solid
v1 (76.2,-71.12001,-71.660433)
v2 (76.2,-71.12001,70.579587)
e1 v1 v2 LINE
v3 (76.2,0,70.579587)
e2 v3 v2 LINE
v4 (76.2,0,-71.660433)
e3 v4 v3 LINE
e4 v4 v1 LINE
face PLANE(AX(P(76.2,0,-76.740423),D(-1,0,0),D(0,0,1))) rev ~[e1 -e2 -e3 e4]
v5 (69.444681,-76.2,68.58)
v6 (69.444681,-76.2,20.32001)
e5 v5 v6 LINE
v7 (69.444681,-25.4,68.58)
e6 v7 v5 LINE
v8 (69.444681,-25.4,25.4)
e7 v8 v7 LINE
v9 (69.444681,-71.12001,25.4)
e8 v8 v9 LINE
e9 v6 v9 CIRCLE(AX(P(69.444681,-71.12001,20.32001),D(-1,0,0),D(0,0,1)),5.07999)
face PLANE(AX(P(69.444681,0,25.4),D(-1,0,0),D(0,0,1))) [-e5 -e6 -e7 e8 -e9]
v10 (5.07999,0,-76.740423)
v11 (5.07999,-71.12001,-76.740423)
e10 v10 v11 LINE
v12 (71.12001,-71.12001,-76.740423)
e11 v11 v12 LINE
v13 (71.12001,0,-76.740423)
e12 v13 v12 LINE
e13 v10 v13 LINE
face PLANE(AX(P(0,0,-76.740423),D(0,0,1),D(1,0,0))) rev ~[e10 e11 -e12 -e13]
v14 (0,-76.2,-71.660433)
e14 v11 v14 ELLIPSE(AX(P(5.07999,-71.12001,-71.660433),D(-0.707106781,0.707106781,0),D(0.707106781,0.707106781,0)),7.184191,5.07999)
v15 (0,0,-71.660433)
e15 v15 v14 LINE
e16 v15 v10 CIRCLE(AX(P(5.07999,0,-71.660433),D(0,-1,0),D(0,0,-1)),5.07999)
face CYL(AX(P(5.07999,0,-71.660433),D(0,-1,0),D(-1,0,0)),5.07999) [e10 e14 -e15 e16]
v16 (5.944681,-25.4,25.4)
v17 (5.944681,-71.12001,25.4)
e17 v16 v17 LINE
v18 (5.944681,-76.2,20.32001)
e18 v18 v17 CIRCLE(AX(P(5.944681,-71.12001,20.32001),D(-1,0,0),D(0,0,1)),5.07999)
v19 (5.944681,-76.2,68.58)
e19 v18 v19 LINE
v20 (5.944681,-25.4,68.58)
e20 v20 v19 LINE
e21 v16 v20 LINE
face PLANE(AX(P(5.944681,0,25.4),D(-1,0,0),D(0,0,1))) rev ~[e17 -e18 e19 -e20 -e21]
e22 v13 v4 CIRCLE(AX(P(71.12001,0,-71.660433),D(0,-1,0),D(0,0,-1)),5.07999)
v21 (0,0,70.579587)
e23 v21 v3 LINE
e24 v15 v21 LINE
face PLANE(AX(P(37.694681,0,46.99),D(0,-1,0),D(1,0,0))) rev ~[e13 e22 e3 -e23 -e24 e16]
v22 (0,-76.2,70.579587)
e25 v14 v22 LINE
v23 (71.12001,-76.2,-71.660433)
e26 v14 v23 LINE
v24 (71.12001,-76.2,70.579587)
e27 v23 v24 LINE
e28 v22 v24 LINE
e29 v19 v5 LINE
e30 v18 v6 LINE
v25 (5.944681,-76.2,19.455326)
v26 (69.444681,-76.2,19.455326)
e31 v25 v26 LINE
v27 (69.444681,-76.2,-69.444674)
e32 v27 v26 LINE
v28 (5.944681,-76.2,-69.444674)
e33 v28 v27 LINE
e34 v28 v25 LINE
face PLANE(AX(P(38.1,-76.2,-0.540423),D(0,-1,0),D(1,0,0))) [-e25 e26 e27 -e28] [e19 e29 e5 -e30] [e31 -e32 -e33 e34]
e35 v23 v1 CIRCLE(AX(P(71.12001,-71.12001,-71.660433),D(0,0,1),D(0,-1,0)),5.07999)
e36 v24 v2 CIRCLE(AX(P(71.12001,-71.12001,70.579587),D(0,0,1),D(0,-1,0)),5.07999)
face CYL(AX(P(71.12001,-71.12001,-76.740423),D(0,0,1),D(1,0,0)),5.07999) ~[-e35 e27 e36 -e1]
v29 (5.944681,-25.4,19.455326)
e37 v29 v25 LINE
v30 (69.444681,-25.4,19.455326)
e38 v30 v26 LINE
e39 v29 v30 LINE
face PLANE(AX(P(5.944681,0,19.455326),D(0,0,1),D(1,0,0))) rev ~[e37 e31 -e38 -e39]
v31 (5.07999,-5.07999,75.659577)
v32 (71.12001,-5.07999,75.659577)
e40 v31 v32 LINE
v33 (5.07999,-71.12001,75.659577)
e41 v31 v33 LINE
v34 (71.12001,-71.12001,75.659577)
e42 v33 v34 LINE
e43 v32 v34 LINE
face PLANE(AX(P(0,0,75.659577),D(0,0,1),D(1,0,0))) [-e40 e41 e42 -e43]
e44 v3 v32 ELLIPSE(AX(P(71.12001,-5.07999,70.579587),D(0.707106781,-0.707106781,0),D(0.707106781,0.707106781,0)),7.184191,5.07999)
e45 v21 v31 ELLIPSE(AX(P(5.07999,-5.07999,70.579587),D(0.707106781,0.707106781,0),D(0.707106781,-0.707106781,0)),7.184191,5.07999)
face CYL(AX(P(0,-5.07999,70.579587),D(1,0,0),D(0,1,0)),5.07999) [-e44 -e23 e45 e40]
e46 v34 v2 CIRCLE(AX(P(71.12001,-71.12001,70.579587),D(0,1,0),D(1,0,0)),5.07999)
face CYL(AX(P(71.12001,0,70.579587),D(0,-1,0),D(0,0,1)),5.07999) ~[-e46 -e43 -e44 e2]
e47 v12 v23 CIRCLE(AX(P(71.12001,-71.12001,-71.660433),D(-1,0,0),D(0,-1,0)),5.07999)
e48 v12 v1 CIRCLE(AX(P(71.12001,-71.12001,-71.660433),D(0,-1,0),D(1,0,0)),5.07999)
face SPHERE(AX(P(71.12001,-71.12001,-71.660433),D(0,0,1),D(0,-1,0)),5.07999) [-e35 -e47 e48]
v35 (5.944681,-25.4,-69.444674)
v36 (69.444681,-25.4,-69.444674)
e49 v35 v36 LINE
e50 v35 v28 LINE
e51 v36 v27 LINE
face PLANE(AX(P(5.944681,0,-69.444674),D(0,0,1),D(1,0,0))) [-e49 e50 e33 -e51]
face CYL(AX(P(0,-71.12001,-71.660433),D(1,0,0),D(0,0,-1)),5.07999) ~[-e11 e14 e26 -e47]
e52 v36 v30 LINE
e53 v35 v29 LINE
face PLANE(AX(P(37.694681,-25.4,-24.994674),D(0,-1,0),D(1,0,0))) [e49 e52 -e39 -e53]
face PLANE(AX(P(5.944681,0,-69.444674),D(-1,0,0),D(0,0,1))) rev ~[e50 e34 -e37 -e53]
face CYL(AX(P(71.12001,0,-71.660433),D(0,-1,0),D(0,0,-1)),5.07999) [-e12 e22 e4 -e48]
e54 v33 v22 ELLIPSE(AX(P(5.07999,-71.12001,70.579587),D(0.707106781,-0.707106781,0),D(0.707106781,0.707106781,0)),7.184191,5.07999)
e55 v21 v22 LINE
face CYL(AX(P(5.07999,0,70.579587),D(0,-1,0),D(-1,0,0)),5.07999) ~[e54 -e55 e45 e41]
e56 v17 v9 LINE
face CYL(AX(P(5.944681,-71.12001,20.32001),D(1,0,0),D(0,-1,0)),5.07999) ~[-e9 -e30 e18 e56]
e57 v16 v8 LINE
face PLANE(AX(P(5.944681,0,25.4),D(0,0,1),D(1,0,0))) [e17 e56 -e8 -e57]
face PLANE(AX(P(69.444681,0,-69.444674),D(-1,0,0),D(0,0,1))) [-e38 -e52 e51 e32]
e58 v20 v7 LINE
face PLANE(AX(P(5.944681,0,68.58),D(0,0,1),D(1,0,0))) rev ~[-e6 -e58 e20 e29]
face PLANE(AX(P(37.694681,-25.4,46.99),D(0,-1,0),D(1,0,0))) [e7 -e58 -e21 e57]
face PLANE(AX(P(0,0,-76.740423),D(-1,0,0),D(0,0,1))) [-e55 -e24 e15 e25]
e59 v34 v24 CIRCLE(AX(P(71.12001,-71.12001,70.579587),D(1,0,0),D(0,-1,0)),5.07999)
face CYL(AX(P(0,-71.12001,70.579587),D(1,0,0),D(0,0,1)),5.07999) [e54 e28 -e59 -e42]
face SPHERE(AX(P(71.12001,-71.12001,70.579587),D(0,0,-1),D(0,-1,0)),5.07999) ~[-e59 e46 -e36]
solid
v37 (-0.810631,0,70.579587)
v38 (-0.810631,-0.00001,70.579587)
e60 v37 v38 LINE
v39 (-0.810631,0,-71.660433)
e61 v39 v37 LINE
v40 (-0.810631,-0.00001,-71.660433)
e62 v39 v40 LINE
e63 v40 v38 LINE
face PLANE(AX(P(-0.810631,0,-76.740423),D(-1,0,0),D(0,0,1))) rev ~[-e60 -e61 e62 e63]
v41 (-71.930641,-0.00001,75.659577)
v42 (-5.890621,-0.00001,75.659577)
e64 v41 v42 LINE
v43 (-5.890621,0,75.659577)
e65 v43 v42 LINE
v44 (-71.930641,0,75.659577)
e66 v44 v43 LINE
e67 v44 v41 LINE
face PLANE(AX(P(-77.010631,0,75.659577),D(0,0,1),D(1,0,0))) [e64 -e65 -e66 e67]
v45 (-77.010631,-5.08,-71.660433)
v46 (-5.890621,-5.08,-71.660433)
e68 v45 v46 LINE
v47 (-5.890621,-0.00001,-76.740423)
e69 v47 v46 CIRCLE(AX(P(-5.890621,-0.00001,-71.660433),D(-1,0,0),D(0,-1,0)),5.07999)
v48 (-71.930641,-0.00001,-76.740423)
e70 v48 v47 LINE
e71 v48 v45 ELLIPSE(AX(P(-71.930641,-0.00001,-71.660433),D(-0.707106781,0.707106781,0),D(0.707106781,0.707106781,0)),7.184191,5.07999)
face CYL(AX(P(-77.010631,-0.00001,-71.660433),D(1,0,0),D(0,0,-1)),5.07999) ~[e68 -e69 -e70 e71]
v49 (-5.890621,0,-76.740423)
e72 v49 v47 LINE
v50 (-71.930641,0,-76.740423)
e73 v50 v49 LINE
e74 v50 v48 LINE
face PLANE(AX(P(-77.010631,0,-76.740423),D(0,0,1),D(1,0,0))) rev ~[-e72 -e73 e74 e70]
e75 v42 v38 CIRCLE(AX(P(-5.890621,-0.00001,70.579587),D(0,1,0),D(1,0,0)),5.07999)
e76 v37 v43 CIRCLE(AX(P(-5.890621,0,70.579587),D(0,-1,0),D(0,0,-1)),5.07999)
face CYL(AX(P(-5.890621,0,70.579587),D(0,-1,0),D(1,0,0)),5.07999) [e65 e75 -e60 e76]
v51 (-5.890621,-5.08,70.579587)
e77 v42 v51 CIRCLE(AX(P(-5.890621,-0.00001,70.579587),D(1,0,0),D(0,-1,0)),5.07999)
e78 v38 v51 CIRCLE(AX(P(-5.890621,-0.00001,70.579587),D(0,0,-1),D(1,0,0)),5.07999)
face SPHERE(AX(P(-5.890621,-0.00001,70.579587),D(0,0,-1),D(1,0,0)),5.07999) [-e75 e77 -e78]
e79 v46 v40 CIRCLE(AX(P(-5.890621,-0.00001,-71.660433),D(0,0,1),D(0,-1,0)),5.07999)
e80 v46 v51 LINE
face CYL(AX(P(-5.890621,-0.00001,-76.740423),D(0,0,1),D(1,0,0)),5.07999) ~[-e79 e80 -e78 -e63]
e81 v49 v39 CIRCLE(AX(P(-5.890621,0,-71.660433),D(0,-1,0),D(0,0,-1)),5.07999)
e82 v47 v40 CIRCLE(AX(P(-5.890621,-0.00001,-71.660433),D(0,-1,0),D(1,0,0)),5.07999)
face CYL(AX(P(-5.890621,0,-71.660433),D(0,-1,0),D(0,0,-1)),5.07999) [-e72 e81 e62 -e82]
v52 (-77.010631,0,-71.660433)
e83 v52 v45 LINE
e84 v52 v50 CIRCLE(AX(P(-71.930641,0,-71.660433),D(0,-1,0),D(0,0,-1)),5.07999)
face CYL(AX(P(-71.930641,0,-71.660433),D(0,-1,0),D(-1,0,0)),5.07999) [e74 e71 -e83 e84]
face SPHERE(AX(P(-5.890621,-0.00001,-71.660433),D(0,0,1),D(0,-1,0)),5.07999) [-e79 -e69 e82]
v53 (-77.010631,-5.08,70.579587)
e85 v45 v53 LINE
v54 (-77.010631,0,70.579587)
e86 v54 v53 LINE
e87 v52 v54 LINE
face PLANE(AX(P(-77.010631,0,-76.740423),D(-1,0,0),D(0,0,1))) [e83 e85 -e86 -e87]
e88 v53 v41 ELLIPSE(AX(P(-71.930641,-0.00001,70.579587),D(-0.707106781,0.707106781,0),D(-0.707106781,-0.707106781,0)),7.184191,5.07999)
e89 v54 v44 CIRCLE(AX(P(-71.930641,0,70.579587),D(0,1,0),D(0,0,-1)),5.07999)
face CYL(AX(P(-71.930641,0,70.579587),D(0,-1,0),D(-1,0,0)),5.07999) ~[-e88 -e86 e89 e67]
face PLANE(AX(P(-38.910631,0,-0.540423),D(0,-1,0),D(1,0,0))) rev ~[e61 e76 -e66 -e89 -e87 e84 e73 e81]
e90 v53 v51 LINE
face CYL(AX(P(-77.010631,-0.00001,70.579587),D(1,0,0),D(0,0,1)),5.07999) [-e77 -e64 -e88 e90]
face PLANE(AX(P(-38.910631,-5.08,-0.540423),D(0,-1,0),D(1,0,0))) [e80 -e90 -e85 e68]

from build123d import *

# Parameters (mm, degrees)
F0_W     = 76.2
F0_H     = 152.4
F1_DEPTH = 5.08
F0_W_2   = 63.5
F0_H_2   = 88.9
F0_H_3   = 43.18
F2_DEPTH = 76.2
F3_DEPTH = 25.4
F4_R     = 5.07999
F4_2_R   = 5.07999


# Not quite as in the source:
# - a fillet or chamfer is up to 0.001 mm smaller than in the source, because OpenCascade refuses the exact size


with BuildPart() as f1:
    # F0 (on Front) → F1 (new body)
    with BuildSketch(Plane.XZ):
        with Locations((-38.910630511, -0.5404228303)):
            Rectangle(F0_W, F0_H)
    extrude(amount=F1_DEPTH)

    # F4 (radius 5.08 in the source; OpenCascade refuses exactly that, so slightly less here)
    f4_edges = [f1.edges().sort_by_distance(p)[0] for p in [
        (-0.810631, -5.08, -0.540423),
        (-38.910631, -5.08, -76.740423),
        (-77.010631, -2.54, 75.659577),
        (-77.010631, -2.54, -76.740423),
        (-0.810631, -2.54, 75.659577),
        (-38.910631, -5.08, 75.659577),
        (-0.810631, -2.54, -76.740423),
    ]]
    fillet(f4_edges, radius=F4_R)


with BuildPart() as f2:
    # F0 (on Front) → F2 (new body)
    with BuildSketch(Plane.XZ):
        with Locations((38.1, -0.5404228303)):
            Rectangle(F0_W, F0_H)
        with Locations((37.6946805432, -24.9946735409)):
            Rectangle(F0_W_2, F0_H_2, mode=Mode.SUBTRACT)
        with Locations((37.6946805432, 46.99)):
            Rectangle(F0_W_2, F0_H_3, mode=Mode.SUBTRACT)
    extrude(amount=F2_DEPTH)

    # F0 (on Front) → F3 (join)
    with BuildSketch(Plane.XZ):
        with Locations((37.6946805432, 46.99)):
            Rectangle(F0_W_2, F0_H_3)
        with Locations((37.6946805432, -24.9946735409)):
            Rectangle(F0_W_2, F0_H_2)
    extrude(amount=F3_DEPTH)

    # F4#2 (radius 5.08 in the source; OpenCascade refuses exactly that, so slightly less here)
    f4_2_edges = [f2.edges().sort_by_distance(p)[0] for p in [
        (76.2, -76.2, -0.540423),
        (38.1, 0, 75.659577),
        (37.694681, -76.2, 25.4),
        (38.1, -76.2, -76.740423),
        (38.1, -76.2, 75.659577),
        (76.2, -38.1, 75.659577),
        (0, -38.1, 75.659577),
        (76.2, -38.1, -76.740423),
        (0, -38.1, -76.740423),
    ]]
    fillet(f4_2_edges, radius=F4_2_R)


solid = Compound([f1.part, f2.part])
